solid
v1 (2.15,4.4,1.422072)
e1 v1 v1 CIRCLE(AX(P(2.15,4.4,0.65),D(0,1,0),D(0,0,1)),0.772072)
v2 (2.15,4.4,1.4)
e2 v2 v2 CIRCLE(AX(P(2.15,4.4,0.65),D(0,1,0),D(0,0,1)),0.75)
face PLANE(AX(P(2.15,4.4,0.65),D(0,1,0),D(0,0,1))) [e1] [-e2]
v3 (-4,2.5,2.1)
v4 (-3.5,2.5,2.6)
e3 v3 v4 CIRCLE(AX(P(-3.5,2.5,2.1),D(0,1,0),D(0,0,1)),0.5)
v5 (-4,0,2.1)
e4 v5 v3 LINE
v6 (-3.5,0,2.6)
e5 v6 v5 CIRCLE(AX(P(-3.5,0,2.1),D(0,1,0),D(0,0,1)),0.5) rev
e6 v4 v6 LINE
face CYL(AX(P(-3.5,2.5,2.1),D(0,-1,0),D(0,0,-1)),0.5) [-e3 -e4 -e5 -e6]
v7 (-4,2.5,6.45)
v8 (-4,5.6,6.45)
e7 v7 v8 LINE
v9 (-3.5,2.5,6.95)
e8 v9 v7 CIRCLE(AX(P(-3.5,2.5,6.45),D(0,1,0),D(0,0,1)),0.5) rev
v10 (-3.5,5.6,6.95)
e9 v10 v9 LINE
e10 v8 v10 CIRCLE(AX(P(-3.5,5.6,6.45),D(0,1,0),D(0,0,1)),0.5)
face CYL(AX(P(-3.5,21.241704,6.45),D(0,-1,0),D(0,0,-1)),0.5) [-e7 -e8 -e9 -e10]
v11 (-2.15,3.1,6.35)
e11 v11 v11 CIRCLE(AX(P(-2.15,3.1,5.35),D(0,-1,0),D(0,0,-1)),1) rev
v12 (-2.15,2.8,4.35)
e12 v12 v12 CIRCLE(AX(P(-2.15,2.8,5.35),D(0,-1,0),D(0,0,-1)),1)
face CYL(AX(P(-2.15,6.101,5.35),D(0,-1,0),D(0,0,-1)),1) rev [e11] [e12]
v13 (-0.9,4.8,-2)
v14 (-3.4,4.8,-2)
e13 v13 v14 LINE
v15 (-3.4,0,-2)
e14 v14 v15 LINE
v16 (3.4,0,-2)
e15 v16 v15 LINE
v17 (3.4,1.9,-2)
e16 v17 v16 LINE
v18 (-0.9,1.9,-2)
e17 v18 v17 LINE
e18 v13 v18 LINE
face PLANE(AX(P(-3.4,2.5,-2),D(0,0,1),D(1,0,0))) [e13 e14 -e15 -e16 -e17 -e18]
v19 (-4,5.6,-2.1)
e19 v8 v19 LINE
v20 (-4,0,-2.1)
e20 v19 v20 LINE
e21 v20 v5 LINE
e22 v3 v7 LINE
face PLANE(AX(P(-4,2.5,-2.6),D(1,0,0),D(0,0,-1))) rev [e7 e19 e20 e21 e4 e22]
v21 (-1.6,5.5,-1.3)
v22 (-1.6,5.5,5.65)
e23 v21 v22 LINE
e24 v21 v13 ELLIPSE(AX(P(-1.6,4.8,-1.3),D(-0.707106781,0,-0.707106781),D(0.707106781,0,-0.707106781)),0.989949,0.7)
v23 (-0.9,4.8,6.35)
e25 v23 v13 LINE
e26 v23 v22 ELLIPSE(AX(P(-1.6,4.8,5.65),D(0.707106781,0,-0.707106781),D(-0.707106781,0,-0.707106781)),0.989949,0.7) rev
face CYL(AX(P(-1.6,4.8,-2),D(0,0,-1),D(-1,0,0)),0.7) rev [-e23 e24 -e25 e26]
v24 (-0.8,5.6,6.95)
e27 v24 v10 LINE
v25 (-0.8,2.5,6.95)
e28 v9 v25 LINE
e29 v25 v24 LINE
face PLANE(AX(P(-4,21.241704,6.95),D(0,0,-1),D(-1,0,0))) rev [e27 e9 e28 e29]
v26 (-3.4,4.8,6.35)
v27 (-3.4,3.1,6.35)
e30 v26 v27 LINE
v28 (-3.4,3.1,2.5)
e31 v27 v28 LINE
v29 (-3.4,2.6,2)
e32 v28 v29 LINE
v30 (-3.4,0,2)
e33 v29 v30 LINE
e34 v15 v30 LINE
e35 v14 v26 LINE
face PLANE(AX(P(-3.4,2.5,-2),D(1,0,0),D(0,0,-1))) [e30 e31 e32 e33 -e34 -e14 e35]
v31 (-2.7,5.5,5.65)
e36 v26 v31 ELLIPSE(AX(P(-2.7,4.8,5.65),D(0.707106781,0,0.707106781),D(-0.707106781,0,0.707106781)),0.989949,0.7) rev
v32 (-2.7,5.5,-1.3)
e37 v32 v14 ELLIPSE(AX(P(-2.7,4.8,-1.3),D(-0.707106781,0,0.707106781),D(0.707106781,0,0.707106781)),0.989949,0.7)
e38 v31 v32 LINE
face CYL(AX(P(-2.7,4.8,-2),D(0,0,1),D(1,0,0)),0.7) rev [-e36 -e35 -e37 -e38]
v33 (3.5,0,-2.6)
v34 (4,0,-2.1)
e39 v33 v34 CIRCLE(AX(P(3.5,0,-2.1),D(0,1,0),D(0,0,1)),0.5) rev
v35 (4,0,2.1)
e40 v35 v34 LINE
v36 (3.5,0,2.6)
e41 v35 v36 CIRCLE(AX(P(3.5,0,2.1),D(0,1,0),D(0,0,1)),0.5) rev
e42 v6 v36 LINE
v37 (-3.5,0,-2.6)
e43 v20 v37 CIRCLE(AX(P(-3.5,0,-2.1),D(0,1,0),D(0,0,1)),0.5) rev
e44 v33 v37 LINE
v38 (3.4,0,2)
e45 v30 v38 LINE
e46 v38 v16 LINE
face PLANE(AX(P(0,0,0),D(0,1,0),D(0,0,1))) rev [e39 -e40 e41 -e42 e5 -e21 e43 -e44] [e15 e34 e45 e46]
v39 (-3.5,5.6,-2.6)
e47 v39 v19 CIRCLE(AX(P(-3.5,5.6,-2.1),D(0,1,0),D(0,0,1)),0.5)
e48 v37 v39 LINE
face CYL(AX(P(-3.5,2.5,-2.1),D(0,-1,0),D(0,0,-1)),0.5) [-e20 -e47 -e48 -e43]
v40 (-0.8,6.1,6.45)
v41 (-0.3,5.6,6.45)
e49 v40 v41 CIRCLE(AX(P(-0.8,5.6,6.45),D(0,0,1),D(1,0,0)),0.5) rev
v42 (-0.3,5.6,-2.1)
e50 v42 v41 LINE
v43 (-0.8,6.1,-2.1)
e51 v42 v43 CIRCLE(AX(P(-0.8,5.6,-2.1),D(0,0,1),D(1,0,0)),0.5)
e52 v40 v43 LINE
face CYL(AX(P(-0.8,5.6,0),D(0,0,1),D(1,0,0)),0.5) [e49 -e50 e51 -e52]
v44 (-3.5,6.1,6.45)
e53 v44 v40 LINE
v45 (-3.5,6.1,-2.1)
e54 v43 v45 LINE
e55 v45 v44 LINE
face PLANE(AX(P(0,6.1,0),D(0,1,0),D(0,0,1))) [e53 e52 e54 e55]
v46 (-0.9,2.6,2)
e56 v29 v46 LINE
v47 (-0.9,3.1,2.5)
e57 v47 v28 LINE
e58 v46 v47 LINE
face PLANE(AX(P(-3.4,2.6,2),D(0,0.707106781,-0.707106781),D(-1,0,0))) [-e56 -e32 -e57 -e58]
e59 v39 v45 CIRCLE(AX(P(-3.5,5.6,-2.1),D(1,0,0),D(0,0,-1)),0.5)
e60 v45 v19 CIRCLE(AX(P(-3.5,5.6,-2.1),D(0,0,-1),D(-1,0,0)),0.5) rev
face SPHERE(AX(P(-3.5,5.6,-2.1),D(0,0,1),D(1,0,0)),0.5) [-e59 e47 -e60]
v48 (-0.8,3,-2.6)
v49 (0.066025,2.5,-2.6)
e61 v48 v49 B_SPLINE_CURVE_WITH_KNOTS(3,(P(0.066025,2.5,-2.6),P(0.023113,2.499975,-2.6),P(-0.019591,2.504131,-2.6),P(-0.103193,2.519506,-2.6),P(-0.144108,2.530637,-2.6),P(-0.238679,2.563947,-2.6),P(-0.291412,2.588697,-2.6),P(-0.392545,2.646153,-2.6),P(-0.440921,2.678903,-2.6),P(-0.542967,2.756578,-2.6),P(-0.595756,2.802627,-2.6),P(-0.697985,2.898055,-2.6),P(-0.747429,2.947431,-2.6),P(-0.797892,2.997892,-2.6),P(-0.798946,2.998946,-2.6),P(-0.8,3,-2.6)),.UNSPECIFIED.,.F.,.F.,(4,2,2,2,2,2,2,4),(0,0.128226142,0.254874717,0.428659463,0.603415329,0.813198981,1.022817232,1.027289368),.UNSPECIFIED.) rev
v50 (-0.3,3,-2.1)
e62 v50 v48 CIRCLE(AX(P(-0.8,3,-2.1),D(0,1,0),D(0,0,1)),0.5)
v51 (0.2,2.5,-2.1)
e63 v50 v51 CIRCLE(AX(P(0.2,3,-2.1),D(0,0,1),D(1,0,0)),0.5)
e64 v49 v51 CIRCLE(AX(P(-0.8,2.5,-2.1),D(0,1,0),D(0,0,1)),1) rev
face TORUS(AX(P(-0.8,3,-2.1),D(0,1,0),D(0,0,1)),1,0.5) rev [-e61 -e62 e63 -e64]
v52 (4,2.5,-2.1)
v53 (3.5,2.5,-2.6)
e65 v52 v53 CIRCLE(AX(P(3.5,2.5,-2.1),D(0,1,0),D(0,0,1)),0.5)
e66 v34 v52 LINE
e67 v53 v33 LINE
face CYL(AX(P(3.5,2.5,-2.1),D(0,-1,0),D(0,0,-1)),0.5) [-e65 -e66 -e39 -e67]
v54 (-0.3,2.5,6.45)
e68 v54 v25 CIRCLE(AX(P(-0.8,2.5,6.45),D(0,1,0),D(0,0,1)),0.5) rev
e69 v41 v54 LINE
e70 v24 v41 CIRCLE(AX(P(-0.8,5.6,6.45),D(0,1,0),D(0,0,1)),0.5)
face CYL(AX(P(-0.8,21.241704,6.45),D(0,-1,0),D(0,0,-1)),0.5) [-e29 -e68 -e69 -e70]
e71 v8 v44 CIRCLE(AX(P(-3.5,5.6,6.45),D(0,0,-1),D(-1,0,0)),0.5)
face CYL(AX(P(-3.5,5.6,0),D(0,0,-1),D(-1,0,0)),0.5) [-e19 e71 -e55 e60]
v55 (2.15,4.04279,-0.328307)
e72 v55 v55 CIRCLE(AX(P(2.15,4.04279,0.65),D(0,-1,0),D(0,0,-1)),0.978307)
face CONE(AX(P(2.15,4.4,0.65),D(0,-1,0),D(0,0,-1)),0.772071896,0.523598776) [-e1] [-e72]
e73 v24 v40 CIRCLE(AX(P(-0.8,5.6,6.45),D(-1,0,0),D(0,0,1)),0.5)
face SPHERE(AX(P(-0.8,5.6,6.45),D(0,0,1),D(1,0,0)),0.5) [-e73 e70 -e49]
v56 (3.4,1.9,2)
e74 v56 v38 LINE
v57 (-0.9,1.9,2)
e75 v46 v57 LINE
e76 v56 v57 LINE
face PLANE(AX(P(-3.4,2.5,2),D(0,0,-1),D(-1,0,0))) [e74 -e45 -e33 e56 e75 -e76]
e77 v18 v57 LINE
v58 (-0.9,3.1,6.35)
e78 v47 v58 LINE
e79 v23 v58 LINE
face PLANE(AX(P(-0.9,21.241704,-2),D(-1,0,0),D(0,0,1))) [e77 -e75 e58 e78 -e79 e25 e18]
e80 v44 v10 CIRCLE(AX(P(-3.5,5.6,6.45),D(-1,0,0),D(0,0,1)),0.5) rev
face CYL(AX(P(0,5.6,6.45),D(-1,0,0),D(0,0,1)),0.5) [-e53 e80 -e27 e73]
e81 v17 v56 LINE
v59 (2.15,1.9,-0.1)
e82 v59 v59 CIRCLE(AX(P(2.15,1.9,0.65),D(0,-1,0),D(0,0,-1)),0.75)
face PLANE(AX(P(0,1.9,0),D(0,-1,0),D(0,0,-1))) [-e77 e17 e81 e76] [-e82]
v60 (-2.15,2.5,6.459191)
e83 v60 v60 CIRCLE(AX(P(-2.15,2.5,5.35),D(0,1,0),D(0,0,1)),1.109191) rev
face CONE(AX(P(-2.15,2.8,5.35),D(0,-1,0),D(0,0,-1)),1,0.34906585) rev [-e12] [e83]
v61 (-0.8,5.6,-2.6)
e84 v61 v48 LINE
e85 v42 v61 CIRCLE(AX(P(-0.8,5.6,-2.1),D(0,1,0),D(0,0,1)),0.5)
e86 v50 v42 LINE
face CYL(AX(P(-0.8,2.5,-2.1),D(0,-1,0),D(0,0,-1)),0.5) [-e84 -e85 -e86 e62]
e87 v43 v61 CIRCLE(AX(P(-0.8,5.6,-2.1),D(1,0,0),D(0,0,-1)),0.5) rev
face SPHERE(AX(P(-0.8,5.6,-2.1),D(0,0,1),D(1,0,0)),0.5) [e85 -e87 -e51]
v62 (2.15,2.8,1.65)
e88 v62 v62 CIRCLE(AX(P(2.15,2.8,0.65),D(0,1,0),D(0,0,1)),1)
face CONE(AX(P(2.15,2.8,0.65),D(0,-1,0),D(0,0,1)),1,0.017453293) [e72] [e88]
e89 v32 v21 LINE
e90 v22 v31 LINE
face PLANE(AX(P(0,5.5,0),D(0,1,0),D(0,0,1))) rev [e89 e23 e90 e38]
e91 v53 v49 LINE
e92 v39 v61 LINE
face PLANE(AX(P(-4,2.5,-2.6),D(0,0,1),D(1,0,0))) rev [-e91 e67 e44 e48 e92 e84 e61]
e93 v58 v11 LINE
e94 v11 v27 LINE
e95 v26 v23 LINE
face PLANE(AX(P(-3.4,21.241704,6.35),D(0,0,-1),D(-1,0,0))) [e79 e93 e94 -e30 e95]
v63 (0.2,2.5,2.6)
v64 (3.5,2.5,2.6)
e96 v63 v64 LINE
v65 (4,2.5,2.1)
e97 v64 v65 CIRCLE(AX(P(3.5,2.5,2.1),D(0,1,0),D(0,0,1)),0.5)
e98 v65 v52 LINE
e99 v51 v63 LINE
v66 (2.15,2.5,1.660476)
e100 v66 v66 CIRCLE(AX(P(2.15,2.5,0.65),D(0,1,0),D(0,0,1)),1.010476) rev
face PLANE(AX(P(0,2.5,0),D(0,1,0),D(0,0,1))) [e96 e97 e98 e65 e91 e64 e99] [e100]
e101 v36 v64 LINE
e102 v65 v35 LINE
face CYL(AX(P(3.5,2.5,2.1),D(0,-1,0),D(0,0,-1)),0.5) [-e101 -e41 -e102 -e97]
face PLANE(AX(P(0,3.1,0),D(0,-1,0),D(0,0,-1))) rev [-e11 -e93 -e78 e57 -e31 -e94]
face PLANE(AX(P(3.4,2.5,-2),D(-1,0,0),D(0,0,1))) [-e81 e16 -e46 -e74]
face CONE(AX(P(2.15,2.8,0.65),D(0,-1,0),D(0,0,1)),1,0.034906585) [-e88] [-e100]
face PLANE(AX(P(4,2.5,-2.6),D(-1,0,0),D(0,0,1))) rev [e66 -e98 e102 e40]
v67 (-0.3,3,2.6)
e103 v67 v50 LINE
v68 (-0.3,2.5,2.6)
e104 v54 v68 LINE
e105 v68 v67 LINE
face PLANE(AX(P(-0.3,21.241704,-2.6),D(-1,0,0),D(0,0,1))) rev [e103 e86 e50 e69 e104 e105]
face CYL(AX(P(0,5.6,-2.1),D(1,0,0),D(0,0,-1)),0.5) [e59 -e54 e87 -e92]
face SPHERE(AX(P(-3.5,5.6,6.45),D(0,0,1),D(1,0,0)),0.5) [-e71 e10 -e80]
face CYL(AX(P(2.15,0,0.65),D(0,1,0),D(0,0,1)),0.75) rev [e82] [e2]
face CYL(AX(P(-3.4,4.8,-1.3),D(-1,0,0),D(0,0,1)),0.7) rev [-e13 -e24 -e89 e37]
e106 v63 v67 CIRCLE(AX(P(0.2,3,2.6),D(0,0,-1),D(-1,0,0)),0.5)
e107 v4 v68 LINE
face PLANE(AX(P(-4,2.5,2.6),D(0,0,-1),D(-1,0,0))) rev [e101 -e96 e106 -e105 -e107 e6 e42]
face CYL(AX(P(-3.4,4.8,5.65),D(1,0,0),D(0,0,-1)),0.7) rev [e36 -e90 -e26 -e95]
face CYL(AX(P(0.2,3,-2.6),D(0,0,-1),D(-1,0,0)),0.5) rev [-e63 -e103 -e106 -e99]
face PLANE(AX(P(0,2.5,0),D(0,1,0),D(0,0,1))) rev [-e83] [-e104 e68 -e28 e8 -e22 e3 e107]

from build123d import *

# Parameters (mm, degrees)
SKETCH1_W               = 8
SKETCH1_H               = 5.2
SKETCH1_W_2             = 6.8
SKETCH1_H_2             = 4
BOSS_EXTRUDE1_DEPTH     = 2.5
SKETCH3_W               = 3.7
SKETCH3_H               = 9.55
SKETCH3_W_2             = 2.5
SKETCH3_H_2             = 8.35
BOSS_EXTRUDE2_DEPTH     = 3
SKETCH4_W               = 3.7
SKETCH4_H               = 4.95
BOSS_EXTRUDE3_DEPTH     = 0.6
SKETCH5_W               = 3.7
SKETCH5_H               = 9.55
BOSS_EXTRUDE4_DEPTH     = 0.6
SKETCH6_W               = 4.9
SKETCH6_H               = 5.2
BOSS_EXTRUDE5_DEPTH     = 0.6
FILLET2_R               = 0.7
SKETCH7_R               = 1
CUT_EXTRUDE1_DEPTH      = 4.5
CUT_EXTRUDE1_DRAFT      = -20
CUT_EXTRUDE3_REACH      = 10.671
SKETCH7_2_R             = 1
BOSS_EXTRUDE6_START     = -0.3
SKETCH8_R               = 1
BOSS_EXTRUDE6_DEPTH     = 1.6
BOSS_EXTRUDE6_DRAFT     = -1
CUT_EXTRUDE2_DEPTH      = 10.146720724
CUT_EXTRUDE2_DEPTH_BACK = 10.146720724
SKETCH9_R               = 0.75
FILLET3_R               = 0.5
FILLET5_R               = 0.5
FILLET6_R               = 0.5
CHAMFER1_SIZE           = 0.5
CHAMFER2_SIZE           = 0.2
CHAMFER2_SIZE2          = 0.357264117


# Read off the part's stored shape, not the designer's step: Boss-Extrude7
with BuildPart() as part:
    # Sketch1 → Boss-Extrude1 (new body)
    with BuildSketch(Plane(origin=(0, 0, 0), x_dir=(1, 0, 0), z_dir=(0, 1, 0))):
        Rectangle(SKETCH1_W, SKETCH1_H)
        Rectangle(SKETCH1_W_2, SKETCH1_H_2, mode=Mode.SUBTRACT)
    extrude(amount=BOSS_EXTRUDE1_DEPTH)

    # Sketch3 → Boss-Extrude2 (add)
    with BuildSketch(Plane(origin=(0, 2.5, 0), x_dir=(1, 0, 0), z_dir=(0, 1, 0))):
        with Locations((-2.15, -2.175)):
            Rectangle(SKETCH3_W, SKETCH3_H)
        with Locations((-2.15, -2.175)):
            Rectangle(SKETCH3_W_2, SKETCH3_H_2, mode=Mode.SUBTRACT)
    extrude(amount=BOSS_EXTRUDE2_DEPTH)

    # Sketch4 → Boss-Extrude3 (add)
    with BuildSketch(Plane.XZ.offset(-2.5)):
        with Locations((-2.15, 4.475)):
            Rectangle(SKETCH4_W, SKETCH4_H)
    extrude(amount=-BOSS_EXTRUDE3_DEPTH)

    # Sketch5 → Boss-Extrude4 (add)
    with BuildSketch(Plane(origin=(0, 5.5, 0), x_dir=(1, 0, 0), z_dir=(0, 1, 0))):
        with Locations((-2.15, -2.175)):
            Rectangle(SKETCH5_W, SKETCH5_H)
    extrude(amount=BOSS_EXTRUDE4_DEPTH)

    # Sketch6 → Boss-Extrude5 (add)
    with BuildSketch(Plane(origin=(0, 2.5, 0), x_dir=(1, 0, 0), z_dir=(0, 1, 0))):
        with Locations((1.55, 0)):
            Rectangle(SKETCH6_W, SKETCH6_H)
    extrude(amount=-BOSS_EXTRUDE5_DEPTH)

    # Fillet2
    fillet2_edges = [part.edges().sort_by_distance(p)[0] for p in [
        (-2.15, 5.5, -2),
        (-0.9, 5.5, 2.175),
        (-2.15, 5.5, 6.35),
        (-3.4, 5.5, 2.175),
    ]]
    fillet(fillet2_edges, radius=FILLET2_R)


with BuildPart() as cut_extrude1_tool:
    # Sketch7 → Cut-Extrude1 (with draft: the straight prism first)
    with BuildSketch(Plane.XZ.offset(-2.8)):
        with Locations((-2.15, 5.35)):
            Circle(SKETCH7_R)
    extrude(amount=CUT_EXTRUDE1_DEPTH)
    # Cut-Extrude1: the draft: its side faces are tilted about the plane it starts from
    cut_extrude1_sides = [cut_extrude1_tool.faces().sort_by_distance(p)[0] for p in [
        (-3.15, 0.55, 5.35),
    ]]
    draft(cut_extrude1_sides, Plane.XZ.offset(-2.8), CUT_EXTRUDE1_DRAFT)


with BuildPart() as part_1:
    add(part.part)

    # Cut-Extrude1: cut by cut_extrude1_tool
    add(cut_extrude1_tool.part, mode=Mode.SUBTRACT)

    # Sketch7<2> → Cut-Extrude3 (cut, up to next)
    with BuildSketch(Plane.XZ.offset(-2.8), mode=Mode.PRIVATE) as cut_extrude3_sk1:
        with Locations(Location((-2.15, 5.35, 0), (0, 0, 270))):
            Circle(SKETCH7_2_R)
    cut_extrude3_tool1 = extrude(cut_extrude3_sk1.sketch, amount=-CUT_EXTRUDE3_REACH, mode=Mode.PRIVATE) & part_1.part
    add(cut_extrude3_tool1.solids().sort_by_distance((-2.15, 2.8, 5.35))[0], mode=Mode.SUBTRACT)



with BuildPart() as body_2:
    # Sketch8 → Boss-Extrude6 (with draft: the straight prism first)
    with BuildSketch(Plane(origin=(0, 2.5, 0), x_dir=(-1, 0, 0), z_dir=(0, -1, 0)).offset(BOSS_EXTRUDE6_START)):
        with Locations((-2.15, -0.65)):
            Circle(SKETCH8_R)
    extrude(amount=-BOSS_EXTRUDE6_DEPTH)
    # Boss-Extrude6: the draft: its side faces are tilted about the plane it starts from
    boss_extrude6_sides = [body_2.faces().sort_by_distance(p)[0] for p in [
        (3.15, 3.6, 0.65),
    ]]
    draft(boss_extrude6_sides, Plane(origin=(0, 2.5, 0), x_dir=(-1, 0, 0), z_dir=(0, -1, 0)).offset(BOSS_EXTRUDE6_START), BOSS_EXTRUDE6_DRAFT)


with BuildPart() as part_2:
    add(part_1.part)

    add(body_2.part)  # Boss-Extrude7 merges body 2
    # Boss-Extrude7 outline → Boss-Extrude7 (revolve)
    with BuildSketch(Plane(origin=(2.15, 0, 0.65), x_dir=(1, 0, 0), z_dir=(0, 0, 1))):
        Polygon((1.010476231, 2.5), (1, 2.8), (0, 2.8), (0, 2.5), align=None)
    revolve(axis=Axis((2.15, 0, 0.65), (0, 1, 0)))

    # Sketch9 → Cut-Extrude2 (cut, two sides: drawn at the far end of the back side and taken through both)
    with BuildSketch(Plane(origin=(0, 4.4, 0), x_dir=(1, 0, 0), z_dir=(0, 1, 0)).offset(-CUT_EXTRUDE2_DEPTH_BACK)):
        with Locations(Location((2.15, -0.65, 0), (0, 0, 270))):
            Circle(SKETCH9_R)
    extrude(amount=CUT_EXTRUDE2_DEPTH + CUT_EXTRUDE2_DEPTH_BACK, mode=Mode.SUBTRACT)

    # Fillet3
    fillet3_edges = [part_2.edges().sort_by_distance(p)[0] for p in [
        (-4, 6.1, 2.175),
        (-2.15, 6.1, 6.95),
        (-0.3, 6.1, 2.175),
        (-2.15, 6.1, -2.6),
    ]]
    fillet(fillet3_edges, radius=FILLET3_R)

    # Fillet5
    # the kernel refuses this fillet: 0.5 mm, written as the material it takes off along each edge
    with BuildSketch(Plane(origin=(-0.8, 5.6, -2.1), x_dir=(1, 0, 0), z_dir=(0, 0, -1))) as fillet5_piece_1_section:
        Polygon((0, 0), (FILLET5_R, 0), (FILLET5_R, -FILLET5_R), (0, -FILLET5_R), align=None)
    fillet5_piece_1 = extrude(amount=FILLET5_R, mode=Mode.PRIVATE)
    fillet5_piece_1 = fillet5_piece_1 - Plane(origin=(-0.8, 5.6, -2.1), x_dir=(-0.7071067811865475, -0.7071067811865475, 0), z_dir=(0, 0, -1)) * Sphere(FILLET5_R, mode=Mode.PRIVATE)
    add(fillet5_piece_1, mode=Mode.SUBTRACT)
    with BuildSketch(Plane(origin=(-0.8, 5.6, 6.45), x_dir=(0, 0, 1), z_dir=(1, 0, 0))) as fillet5_piece_2_section:
        Polygon((0, 0), (FILLET5_R, 0), (FILLET5_R, -FILLET5_R), (0, -FILLET5_R), align=None)
    fillet5_piece_2 = extrude(amount=FILLET5_R, mode=Mode.PRIVATE)
    fillet5_piece_2 = fillet5_piece_2 - Plane(origin=(-0.8, 5.6, 6.45), x_dir=(0, -0.7071067811865475, -0.7071067811865475), z_dir=(1, 0, 0)) * Sphere(FILLET5_R, mode=Mode.PRIVATE)
    add(fillet5_piece_2, mode=Mode.SUBTRACT)
    with BuildSketch(Plane(origin=(-3.5, 5.6, -2.1), x_dir=(-1, 0, 0), z_dir=(0, 0, -1))) as fillet5_piece_3_section:
        Polygon((0, 0), (FILLET5_R, 0), (FILLET5_R, FILLET5_R), (0, FILLET5_R), align=None)
    fillet5_piece_3 = extrude(amount=FILLET5_R, mode=Mode.PRIVATE)
    fillet5_piece_3 = fillet5_piece_3 - Plane(origin=(-3.5, 5.6, -2.1), x_dir=(0.7071067811865475, -0.7071067811865475, 0), z_dir=(0, 0, -1)) * Sphere(FILLET5_R, mode=Mode.PRIVATE)
    add(fillet5_piece_3, mode=Mode.SUBTRACT)
    with BuildSketch(Plane(origin=(-3.5, 5.6, 6.45), x_dir=(0, 0, 1), z_dir=(-1, 0, 0))) as fillet5_piece_4_section:
        Polygon((0, 0), (FILLET5_R, 0), (FILLET5_R, FILLET5_R), (0, FILLET5_R), align=None)
    fillet5_piece_4 = extrude(amount=FILLET5_R, mode=Mode.PRIVATE)
    fillet5_piece_4 = fillet5_piece_4 - Plane(origin=(-3.5, 5.6, 6.45), x_dir=(0, -0.7071067811865475, -0.7071067811865475), z_dir=(-1, 0, 0)) * Sphere(FILLET5_R, mode=Mode.PRIVATE)
    add(fillet5_piece_4, mode=Mode.SUBTRACT)
    with BuildSketch(Plane(origin=(4, 3.75, 2.6), x_dir=(0, 0, -1), z_dir=(0, -1, 0)), Plane(origin=(4, 3.75, -2.6), x_dir=(-1, 0, 0), z_dir=(0, -1, 0))) as fillet5_piece_5:
        with BuildLine():
            CenterArc((FILLET5_R, -FILLET5_R), FILLET5_R, 90, 90)
            Line((0, -FILLET5_R), (0, 0))
            Line((0, 0), (FILLET5_R, 0))
        make_face()
    extrude(amount=5, mode=Mode.SUBTRACT)
    with BuildSketch(Plane(origin=(-4, 1.25, 6.95), x_dir=(0, 0, -1), z_dir=(0, 1, 0)), Plane(origin=(-0.3, 5.6, 6.95), x_dir=(0, 0, -1), z_dir=(0, -1, 0))) as fillet5_piece_6:
        with BuildLine():
            CenterArc((FILLET5_R, -FILLET5_R), FILLET5_R, 90, 90)
            Line((0, -FILLET5_R), (0, 0))
            Line((0, 0), (FILLET5_R, 0))
        make_face()
    extrude(amount=4.35, mode=Mode.SUBTRACT)
    with BuildSketch(Plane(origin=(-4, -1.25, -2.6), x_dir=(1, 0, 0), z_dir=(0, 1, 0))) as fillet5_piece_7:
        with BuildLine():
            CenterArc((FILLET5_R, -FILLET5_R), FILLET5_R, 90, 90)
            Line((0, -FILLET5_R), (0, 0))
            Line((0, 0), (FILLET5_R, 0))
        make_face()
    extrude(amount=6.85, mode=Mode.SUBTRACT)
    with BuildSketch(Plane(origin=(-0.3, 5.6, -2.6), x_dir=(-1, 0, 0), z_dir=(0, -1, 0))) as fillet5_piece_8:
        with BuildLine():
            CenterArc((FILLET5_R, -FILLET5_R), FILLET5_R, 90, 90)
            Line((0, -FILLET5_R), (0, 0))
            Line((0, 0), (FILLET5_R, 0))
        make_face()
    extrude(amount=3.1, mode=Mode.SUBTRACT)
    with BuildSketch(Plane(origin=(-4, -1.25, 2.6), x_dir=(0, 0, -1), z_dir=(0, 1, 0))) as fillet5_piece_9:
        with BuildLine():
            CenterArc((FILLET5_R, -FILLET5_R), FILLET5_R, 90, 90)
            Line((0, -FILLET5_R), (0, 0))
            Line((0, 0), (FILLET5_R, 0))
        make_face()
    extrude(amount=3.75, mode=Mode.SUBTRACT)

    # Fillet6
    # the kernel refuses this fillet: 0.5 mm, written as the material it adds along each edge
    with BuildSketch(Plane(origin=(-0.3, 2.5, 2.6), x_dir=(0, 1, 0), z_dir=(0, 0, -1))) as fillet6_piece_1:
        with BuildLine():
            CenterArc((FILLET6_R, FILLET6_R), FILLET6_R, 180, 90)
            Line((0, FILLET6_R), (0, 0))
            Line((0, 0), (FILLET6_R, 0))
        make_face()
    extrude(amount=4.7)
    with BuildSketch(Plane(origin=(-0.8, 2.5, -2.1), x_dir=(-0.5976672776328278, 0, 0.8017442392976482), z_dir=(0.8017442392976482, 0, 0.5976672776328278))) as fillet6_piece_2_section:
        with BuildLine():
            CenterArc((0.5 + FILLET6_R, -FILLET6_R), FILLET6_R, 90, 90)
            Line((0.5, -FILLET6_R), (0.5, 0))
            Line((0.5, 0), (0.5 + FILLET6_R, 0))
        make_face()
    fillet6_piece_2 = revolve(axis=Axis((-0.8, 2.5, -2.1), (0, -1, 0)), revolution_arc=233.296989237, mode=Mode.PRIVATE)
    fillet6_piece_2 = split(fillet6_piece_2, bisect_by=Plane(origin=(-0.425030478, 2.655814189, -2.6), z_dir=(0, 0, 1)), keep=Keep.TOP, mode=Mode.PRIVATE)
    fillet6_piece_2 = split(fillet6_piece_2, bisect_by=Plane(origin=(-0.425030478, 2.655814189, -2), z_dir=(0, 0, -1)), keep=Keep.TOP, mode=Mode.PRIVATE)
    add(fillet6_piece_2)

    # Chamfer1
    chamfer1_edges = [part_2.edges().sort_by_distance(p)[0] for p in [
        (-2.15, 3.1, 2),
    ]]
    chamfer(chamfer1_edges, length=CHAMFER1_SIZE)

    # Chamfer2
    chamfer2_edges = [part_2.edges().sort_by_distance(p)[0] for p in [
        (3.122071896, 4.4, 0.65),
    ]]
    chamfer2_side = [part_2.faces().sort_by_distance(p)[0] for p in [
        (3.094577551, 4.4, 0.65),
    ]]
    chamfer(chamfer2_edges, length=CHAMFER2_SIZE, length2=CHAMFER2_SIZE2, reference=chamfer2_side[0])


solid = part_2.part
